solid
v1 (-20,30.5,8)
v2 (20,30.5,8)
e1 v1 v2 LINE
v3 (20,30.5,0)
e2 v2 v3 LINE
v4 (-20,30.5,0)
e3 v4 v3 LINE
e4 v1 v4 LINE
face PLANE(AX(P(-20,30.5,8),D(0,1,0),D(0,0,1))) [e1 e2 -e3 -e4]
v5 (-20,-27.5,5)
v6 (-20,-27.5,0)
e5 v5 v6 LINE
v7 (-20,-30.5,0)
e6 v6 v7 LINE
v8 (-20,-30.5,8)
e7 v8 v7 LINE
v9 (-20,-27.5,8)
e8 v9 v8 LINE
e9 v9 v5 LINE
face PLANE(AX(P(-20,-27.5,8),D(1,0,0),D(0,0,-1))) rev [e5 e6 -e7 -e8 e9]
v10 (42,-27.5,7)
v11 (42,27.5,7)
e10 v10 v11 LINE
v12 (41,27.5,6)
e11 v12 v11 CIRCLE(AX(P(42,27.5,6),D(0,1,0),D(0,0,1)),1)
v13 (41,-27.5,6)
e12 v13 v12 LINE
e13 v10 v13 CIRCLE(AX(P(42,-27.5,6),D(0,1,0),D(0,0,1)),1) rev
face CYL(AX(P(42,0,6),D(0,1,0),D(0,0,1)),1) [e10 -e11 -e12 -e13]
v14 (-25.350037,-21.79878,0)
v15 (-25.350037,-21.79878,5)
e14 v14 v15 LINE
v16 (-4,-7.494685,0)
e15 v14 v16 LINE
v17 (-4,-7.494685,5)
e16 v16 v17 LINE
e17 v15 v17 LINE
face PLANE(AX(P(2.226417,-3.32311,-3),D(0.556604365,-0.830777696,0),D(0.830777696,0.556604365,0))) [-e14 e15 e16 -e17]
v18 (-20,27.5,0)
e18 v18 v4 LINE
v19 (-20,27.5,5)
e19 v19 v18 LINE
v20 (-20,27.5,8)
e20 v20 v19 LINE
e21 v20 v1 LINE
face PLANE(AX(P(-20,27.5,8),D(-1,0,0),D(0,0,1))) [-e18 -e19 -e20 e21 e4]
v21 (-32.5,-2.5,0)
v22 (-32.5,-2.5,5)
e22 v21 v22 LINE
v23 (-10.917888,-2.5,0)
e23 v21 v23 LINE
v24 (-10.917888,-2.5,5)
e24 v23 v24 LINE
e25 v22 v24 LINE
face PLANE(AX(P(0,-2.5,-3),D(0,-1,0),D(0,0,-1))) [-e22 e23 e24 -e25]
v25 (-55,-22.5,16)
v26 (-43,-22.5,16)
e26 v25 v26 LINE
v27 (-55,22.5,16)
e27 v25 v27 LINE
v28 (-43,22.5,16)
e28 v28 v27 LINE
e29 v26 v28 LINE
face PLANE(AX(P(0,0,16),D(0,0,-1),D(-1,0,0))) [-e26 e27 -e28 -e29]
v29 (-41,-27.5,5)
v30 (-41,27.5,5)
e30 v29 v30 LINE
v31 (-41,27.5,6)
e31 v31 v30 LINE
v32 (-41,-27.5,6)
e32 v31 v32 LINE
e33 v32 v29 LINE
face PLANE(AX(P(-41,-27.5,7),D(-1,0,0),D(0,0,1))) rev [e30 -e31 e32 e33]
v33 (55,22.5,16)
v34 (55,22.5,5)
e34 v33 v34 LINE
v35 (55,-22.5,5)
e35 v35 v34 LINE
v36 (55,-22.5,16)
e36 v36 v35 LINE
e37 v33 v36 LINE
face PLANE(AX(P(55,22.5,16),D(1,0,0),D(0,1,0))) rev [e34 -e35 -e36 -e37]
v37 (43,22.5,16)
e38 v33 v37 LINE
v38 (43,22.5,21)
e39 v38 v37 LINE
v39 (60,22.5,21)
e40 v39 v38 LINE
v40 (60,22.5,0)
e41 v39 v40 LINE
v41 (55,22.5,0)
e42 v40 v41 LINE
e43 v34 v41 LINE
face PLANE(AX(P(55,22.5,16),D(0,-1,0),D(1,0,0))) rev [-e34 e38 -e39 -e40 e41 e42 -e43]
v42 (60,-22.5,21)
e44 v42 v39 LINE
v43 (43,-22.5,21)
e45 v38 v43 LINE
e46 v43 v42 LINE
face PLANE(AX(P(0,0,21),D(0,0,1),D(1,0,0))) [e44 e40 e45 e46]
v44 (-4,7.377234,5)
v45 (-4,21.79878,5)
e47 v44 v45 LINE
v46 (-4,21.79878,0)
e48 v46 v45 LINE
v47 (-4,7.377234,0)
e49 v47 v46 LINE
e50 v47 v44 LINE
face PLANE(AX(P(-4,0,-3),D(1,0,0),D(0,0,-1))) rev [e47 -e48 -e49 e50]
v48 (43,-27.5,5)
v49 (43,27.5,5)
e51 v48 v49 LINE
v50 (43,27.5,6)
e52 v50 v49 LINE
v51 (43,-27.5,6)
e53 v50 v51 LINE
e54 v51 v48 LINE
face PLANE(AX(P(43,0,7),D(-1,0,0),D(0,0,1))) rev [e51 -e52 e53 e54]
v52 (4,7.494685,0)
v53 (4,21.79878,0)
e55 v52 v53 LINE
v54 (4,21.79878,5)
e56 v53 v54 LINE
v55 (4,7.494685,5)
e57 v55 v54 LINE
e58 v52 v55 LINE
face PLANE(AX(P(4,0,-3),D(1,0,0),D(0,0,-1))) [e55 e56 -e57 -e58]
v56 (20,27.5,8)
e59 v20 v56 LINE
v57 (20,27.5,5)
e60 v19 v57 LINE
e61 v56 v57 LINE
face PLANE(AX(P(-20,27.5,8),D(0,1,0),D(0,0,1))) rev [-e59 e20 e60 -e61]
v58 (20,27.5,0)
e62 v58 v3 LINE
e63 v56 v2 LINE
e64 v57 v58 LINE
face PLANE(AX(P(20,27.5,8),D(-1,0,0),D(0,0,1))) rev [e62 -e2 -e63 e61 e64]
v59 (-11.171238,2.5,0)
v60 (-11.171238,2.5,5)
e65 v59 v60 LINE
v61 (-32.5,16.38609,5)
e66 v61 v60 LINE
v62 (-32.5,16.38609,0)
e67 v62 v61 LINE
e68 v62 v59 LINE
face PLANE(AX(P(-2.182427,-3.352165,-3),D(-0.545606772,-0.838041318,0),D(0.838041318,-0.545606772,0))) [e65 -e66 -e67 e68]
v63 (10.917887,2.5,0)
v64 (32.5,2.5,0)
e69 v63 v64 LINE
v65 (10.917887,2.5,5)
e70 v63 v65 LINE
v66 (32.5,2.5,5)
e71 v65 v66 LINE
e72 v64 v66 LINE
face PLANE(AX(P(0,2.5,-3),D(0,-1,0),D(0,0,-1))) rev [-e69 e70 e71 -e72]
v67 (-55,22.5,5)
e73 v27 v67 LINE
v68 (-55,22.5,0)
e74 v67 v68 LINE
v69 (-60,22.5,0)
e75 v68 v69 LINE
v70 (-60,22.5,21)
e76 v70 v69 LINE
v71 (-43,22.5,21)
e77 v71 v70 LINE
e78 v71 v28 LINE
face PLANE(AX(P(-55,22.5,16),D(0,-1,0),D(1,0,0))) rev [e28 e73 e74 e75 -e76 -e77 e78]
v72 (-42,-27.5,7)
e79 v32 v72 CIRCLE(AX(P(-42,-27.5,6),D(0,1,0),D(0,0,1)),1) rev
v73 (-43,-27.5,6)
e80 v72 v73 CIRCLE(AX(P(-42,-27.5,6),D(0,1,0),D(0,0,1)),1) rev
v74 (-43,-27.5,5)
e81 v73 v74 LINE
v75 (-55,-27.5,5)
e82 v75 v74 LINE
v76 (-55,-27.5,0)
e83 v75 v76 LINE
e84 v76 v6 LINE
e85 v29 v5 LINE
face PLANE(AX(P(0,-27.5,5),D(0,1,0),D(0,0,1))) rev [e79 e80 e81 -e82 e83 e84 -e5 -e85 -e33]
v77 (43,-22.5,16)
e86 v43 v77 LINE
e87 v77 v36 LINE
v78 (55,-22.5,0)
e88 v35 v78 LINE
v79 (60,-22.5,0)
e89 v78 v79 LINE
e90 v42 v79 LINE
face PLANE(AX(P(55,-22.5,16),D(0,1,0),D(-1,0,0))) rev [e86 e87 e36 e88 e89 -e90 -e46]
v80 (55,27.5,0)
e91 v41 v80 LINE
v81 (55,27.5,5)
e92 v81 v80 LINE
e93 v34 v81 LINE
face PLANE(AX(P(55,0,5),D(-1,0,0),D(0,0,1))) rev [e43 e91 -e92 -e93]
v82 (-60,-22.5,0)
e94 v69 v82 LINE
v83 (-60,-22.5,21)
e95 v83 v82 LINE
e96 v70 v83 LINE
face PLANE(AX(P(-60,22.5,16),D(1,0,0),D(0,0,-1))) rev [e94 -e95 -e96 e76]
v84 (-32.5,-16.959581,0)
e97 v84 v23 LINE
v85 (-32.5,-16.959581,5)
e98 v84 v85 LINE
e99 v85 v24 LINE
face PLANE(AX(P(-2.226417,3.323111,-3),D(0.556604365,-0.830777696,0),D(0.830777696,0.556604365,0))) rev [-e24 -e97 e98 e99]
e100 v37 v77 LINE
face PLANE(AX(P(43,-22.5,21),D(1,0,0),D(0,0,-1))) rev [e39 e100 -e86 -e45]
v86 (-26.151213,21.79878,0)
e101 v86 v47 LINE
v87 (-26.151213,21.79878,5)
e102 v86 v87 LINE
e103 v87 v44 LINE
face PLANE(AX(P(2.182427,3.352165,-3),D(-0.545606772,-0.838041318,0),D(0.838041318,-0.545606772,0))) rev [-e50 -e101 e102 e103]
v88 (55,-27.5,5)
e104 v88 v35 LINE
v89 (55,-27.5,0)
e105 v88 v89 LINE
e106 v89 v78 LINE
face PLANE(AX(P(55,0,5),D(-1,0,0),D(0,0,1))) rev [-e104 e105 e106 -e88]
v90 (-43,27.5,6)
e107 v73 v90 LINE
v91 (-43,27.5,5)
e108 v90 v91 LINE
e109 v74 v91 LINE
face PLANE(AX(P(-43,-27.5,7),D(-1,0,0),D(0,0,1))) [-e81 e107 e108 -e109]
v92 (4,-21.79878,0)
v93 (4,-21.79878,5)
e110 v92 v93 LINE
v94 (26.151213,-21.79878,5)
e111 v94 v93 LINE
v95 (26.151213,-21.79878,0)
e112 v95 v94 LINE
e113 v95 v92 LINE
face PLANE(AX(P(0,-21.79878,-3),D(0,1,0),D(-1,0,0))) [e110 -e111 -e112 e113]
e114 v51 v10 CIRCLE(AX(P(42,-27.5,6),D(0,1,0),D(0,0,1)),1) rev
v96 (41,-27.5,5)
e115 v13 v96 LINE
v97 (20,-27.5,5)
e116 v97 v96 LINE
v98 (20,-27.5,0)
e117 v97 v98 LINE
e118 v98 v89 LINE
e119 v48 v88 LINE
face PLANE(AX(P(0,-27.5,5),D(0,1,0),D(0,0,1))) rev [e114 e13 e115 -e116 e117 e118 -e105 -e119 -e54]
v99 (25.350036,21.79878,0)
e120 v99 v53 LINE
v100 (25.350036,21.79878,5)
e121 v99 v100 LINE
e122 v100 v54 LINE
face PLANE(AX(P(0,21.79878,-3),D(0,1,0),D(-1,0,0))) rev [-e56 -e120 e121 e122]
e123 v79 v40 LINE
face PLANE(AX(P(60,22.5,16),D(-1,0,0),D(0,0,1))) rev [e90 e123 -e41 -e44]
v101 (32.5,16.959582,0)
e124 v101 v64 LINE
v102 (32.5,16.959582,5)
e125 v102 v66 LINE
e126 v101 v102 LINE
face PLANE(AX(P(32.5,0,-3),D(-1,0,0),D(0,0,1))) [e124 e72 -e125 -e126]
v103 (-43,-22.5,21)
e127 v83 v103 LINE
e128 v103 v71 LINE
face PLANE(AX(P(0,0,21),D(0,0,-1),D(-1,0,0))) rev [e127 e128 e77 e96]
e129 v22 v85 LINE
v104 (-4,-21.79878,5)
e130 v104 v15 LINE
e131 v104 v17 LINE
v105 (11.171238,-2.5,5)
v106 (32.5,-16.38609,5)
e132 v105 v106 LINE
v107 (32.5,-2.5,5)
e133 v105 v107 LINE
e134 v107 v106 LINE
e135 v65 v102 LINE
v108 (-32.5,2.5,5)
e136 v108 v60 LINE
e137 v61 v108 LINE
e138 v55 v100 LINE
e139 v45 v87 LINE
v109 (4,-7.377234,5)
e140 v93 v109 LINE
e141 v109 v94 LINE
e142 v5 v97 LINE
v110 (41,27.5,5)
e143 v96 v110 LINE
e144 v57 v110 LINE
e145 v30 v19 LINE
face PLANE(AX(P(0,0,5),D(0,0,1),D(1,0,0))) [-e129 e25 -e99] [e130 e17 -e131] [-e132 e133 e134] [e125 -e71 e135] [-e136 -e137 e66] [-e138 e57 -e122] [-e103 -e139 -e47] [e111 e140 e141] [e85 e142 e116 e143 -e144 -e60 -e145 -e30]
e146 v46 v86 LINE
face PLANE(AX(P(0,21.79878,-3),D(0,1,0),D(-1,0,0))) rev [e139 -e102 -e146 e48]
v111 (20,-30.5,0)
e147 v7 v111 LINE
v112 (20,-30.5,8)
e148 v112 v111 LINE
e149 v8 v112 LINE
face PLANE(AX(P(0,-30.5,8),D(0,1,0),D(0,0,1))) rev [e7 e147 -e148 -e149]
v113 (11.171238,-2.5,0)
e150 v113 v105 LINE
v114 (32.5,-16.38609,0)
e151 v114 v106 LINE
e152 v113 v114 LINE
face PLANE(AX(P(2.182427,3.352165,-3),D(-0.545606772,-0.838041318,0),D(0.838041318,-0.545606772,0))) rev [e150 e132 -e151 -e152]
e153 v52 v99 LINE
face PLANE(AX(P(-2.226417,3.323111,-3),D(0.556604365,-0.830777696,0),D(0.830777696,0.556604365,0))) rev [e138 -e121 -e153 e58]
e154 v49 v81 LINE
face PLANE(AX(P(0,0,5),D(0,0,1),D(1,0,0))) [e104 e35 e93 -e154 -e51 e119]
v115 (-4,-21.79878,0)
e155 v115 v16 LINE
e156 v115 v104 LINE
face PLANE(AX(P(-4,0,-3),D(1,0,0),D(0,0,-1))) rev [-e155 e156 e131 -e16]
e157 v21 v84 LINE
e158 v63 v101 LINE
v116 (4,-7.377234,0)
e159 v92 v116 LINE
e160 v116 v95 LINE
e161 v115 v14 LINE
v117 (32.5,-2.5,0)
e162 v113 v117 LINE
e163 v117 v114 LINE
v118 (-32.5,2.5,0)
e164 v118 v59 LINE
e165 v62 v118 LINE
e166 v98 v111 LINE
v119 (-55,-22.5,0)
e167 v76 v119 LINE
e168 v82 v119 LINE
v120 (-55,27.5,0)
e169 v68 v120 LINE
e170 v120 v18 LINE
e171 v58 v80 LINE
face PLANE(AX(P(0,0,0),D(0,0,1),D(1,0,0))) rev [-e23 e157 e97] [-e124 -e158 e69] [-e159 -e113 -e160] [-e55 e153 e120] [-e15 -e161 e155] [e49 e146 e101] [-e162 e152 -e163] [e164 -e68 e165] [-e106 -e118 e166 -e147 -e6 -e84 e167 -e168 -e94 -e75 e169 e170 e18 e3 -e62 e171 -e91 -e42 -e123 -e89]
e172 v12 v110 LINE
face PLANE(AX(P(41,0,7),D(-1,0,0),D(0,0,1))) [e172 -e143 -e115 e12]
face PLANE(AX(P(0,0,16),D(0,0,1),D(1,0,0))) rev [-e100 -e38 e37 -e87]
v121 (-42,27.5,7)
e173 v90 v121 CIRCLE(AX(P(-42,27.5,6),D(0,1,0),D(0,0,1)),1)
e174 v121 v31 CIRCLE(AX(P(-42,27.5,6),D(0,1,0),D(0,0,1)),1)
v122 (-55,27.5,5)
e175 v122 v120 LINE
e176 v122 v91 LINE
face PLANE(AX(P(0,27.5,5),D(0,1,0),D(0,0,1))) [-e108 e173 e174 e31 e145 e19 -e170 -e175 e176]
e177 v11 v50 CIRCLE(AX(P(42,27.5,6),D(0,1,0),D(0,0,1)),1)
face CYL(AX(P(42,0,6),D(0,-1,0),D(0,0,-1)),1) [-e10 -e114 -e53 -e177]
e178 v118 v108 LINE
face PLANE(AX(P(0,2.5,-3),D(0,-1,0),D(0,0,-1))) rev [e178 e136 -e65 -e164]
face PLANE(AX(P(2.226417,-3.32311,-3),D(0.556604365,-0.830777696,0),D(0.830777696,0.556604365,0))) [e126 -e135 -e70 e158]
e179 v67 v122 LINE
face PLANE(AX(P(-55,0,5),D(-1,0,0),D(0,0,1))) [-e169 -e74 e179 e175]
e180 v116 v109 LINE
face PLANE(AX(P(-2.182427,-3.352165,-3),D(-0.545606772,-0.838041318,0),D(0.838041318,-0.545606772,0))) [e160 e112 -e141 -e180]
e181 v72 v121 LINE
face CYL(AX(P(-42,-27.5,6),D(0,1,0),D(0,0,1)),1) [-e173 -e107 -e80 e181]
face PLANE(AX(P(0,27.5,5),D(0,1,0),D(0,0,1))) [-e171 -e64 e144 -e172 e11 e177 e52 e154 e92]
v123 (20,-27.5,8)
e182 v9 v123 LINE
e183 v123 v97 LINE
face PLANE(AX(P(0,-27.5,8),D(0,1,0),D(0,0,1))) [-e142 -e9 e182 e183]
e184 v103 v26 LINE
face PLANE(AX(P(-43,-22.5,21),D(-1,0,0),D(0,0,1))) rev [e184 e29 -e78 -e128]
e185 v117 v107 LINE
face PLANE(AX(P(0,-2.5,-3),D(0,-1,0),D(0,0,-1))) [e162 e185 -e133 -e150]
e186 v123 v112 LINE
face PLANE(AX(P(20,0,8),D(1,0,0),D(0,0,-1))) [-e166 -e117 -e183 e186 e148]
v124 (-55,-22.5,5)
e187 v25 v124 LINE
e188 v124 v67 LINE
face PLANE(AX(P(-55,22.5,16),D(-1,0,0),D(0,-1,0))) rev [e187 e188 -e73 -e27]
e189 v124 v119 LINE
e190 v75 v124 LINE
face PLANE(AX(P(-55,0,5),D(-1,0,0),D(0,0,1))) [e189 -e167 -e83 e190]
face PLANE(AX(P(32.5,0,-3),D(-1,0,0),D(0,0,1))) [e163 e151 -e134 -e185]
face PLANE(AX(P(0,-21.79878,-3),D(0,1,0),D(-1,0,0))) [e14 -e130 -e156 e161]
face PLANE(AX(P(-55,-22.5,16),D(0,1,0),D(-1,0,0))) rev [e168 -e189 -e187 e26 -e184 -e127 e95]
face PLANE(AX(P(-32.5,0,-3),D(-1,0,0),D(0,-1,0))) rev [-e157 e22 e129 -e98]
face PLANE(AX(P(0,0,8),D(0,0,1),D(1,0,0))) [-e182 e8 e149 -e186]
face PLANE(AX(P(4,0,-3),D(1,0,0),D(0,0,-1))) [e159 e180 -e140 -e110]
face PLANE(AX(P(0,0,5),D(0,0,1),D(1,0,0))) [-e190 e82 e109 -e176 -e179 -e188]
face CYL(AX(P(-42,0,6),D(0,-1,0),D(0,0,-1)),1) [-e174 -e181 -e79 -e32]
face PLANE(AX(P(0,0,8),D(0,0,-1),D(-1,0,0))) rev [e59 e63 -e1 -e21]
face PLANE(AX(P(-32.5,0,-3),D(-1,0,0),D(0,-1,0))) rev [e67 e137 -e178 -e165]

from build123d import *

# Parameters (mm, degrees)
SKETCH1_W             = 82
SKETCH1_H             = 55
BOSS_EXTRUDE1_DEPTH   = 5
SKETCH1_W_2           = 12
BOSS_EXTRUDE1_2_DEPTH = 5
BOSS_EXTRUDE1_3_DEPTH = 5
SKETCH1_3_W           = 2
SKETCH1_3_H           = 55
BOSS_EXTRUDE2_DEPTH   = 7
FILLET1_R             = 1
SKETCH2_W             = 5
SKETCH2_H             = 45
BOSS_EXTRUDE3_DEPTH   = 16
SKETCH3_W             = 17
SKETCH3_H             = 45
BOSS_EXTRUDE4_DEPTH   = 5
SKETCH4_W             = 40
SKETCH4_H             = 3
BOSS_EXTRUDE5_DEPTH   = 8
CUT_EXTRUDE1_DEPTH    = 8


with BuildPart() as part:
    # Sketch1 → Boss-Extrude1 (new body)
    with BuildSketch(Plane.XY):
        Rectangle(SKETCH1_W, SKETCH1_H)
    extrude(amount=BOSS_EXTRUDE1_DEPTH)



with BuildPart() as body_2:
    # Sketch1 → Boss-Extrude1 2 (new body)
    with BuildSketch(Plane.XY):
        with Locations((-49, 0)):
            Rectangle(SKETCH1_W_2, SKETCH1_H)
    extrude(amount=BOSS_EXTRUDE1_2_DEPTH)


with BuildPart() as body_3:
    # Sketch1 → Boss-Extrude1 3 (new body)
    with BuildSketch(Plane.XY):
        with Locations((49, 0)):
            Rectangle(SKETCH1_W_2, SKETCH1_H)
    extrude(amount=BOSS_EXTRUDE1_3_DEPTH)


with BuildPart() as part_1:
    add(part.part)

    add(body_2.part)  # Boss-Extrude2 merges body 2

    add(body_3.part)  # Boss-Extrude2 merges body 3
    # Sketch1<3> → Boss-Extrude2 (add)
    with BuildSketch(Plane.XY):
        with Locations((42, 0)):
            Rectangle(SKETCH1_3_W, SKETCH1_3_H)
        with Locations((-42, 0)):
            Rectangle(SKETCH1_3_W, SKETCH1_3_H)
    extrude(amount=BOSS_EXTRUDE2_DEPTH)

    # Fillet1
    fillet1_edges = [part_1.edges().sort_by_distance(p)[0] for p in [
        (-43, 0, 7),
        (-41, 0, 7),
        (41, 0, 7),
        (43, 0, 7),
    ]]
    fillet(fillet1_edges, radius=FILLET1_R - 0.0001)  # a hair under: the kernel refuses the full size

    # Sketch2 → Boss-Extrude3 (add)
    with BuildSketch(Plane.XY):
        with Locations((-57.5, 0)):
            Rectangle(SKETCH2_W, SKETCH2_H)
        with Locations((57.5, 0)):
            Rectangle(SKETCH2_W, SKETCH2_H)
    extrude(amount=BOSS_EXTRUDE3_DEPTH)

    # Sketch3 → Boss-Extrude4 (add)
    with BuildSketch(Plane.XY.offset(16)):
        with Locations((51.5, 0)):
            Rectangle(SKETCH3_W, SKETCH3_H)
        with Locations((-51.5, 0)):
            Rectangle(SKETCH3_W, SKETCH3_H)
    extrude(amount=BOSS_EXTRUDE4_DEPTH)

    # Sketch4 → Boss-Extrude5 (add)
    with BuildSketch(Plane.XY):
        with Locations((0, -29)):
            Rectangle(SKETCH4_W, SKETCH4_H)
        with Locations((0, 29)):
            Rectangle(SKETCH4_W, SKETCH4_H)
    extrude(amount=BOSS_EXTRUDE5_DEPTH)

    # Sketch5 → Cut-Extrude1 (cut)
    with BuildSketch(Plane.XY.offset(5)):
        Polygon((32.5, -2.5), (11.171238341, -2.5), (32.5, -16.386089579), align=None)
        Polygon((26.151212641, -21.798780488), (4, -7.377234224), (4, -21.798780488), align=None)
        Polygon((-4, -7.494684737), (-25.350036879, -21.798780488), (-4, -21.798780488), align=None)
        Polygon((-10.917888224, -2.5), (-32.5, -2.5), (-32.5, -16.959581269), align=None)
        Polygon((-11.171238341, 2.5), (-32.5, 16.386089579), (-32.5, 2.5), align=None)
        Polygon((-4, 21.798780488), (-26.151212641, 21.798780488), (-4, 7.377234224), align=None)
        Polygon((25.350035913, 21.798780488), (4, 21.798780488), (4, 7.494685385), align=None)
        Polygon((32.5, 2.5), (32.5, 16.959581917), (10.917887257, 2.5), align=None)
    extrude(amount=-CUT_EXTRUDE1_DEPTH, mode=Mode.SUBTRACT)


solid = part_1.part
